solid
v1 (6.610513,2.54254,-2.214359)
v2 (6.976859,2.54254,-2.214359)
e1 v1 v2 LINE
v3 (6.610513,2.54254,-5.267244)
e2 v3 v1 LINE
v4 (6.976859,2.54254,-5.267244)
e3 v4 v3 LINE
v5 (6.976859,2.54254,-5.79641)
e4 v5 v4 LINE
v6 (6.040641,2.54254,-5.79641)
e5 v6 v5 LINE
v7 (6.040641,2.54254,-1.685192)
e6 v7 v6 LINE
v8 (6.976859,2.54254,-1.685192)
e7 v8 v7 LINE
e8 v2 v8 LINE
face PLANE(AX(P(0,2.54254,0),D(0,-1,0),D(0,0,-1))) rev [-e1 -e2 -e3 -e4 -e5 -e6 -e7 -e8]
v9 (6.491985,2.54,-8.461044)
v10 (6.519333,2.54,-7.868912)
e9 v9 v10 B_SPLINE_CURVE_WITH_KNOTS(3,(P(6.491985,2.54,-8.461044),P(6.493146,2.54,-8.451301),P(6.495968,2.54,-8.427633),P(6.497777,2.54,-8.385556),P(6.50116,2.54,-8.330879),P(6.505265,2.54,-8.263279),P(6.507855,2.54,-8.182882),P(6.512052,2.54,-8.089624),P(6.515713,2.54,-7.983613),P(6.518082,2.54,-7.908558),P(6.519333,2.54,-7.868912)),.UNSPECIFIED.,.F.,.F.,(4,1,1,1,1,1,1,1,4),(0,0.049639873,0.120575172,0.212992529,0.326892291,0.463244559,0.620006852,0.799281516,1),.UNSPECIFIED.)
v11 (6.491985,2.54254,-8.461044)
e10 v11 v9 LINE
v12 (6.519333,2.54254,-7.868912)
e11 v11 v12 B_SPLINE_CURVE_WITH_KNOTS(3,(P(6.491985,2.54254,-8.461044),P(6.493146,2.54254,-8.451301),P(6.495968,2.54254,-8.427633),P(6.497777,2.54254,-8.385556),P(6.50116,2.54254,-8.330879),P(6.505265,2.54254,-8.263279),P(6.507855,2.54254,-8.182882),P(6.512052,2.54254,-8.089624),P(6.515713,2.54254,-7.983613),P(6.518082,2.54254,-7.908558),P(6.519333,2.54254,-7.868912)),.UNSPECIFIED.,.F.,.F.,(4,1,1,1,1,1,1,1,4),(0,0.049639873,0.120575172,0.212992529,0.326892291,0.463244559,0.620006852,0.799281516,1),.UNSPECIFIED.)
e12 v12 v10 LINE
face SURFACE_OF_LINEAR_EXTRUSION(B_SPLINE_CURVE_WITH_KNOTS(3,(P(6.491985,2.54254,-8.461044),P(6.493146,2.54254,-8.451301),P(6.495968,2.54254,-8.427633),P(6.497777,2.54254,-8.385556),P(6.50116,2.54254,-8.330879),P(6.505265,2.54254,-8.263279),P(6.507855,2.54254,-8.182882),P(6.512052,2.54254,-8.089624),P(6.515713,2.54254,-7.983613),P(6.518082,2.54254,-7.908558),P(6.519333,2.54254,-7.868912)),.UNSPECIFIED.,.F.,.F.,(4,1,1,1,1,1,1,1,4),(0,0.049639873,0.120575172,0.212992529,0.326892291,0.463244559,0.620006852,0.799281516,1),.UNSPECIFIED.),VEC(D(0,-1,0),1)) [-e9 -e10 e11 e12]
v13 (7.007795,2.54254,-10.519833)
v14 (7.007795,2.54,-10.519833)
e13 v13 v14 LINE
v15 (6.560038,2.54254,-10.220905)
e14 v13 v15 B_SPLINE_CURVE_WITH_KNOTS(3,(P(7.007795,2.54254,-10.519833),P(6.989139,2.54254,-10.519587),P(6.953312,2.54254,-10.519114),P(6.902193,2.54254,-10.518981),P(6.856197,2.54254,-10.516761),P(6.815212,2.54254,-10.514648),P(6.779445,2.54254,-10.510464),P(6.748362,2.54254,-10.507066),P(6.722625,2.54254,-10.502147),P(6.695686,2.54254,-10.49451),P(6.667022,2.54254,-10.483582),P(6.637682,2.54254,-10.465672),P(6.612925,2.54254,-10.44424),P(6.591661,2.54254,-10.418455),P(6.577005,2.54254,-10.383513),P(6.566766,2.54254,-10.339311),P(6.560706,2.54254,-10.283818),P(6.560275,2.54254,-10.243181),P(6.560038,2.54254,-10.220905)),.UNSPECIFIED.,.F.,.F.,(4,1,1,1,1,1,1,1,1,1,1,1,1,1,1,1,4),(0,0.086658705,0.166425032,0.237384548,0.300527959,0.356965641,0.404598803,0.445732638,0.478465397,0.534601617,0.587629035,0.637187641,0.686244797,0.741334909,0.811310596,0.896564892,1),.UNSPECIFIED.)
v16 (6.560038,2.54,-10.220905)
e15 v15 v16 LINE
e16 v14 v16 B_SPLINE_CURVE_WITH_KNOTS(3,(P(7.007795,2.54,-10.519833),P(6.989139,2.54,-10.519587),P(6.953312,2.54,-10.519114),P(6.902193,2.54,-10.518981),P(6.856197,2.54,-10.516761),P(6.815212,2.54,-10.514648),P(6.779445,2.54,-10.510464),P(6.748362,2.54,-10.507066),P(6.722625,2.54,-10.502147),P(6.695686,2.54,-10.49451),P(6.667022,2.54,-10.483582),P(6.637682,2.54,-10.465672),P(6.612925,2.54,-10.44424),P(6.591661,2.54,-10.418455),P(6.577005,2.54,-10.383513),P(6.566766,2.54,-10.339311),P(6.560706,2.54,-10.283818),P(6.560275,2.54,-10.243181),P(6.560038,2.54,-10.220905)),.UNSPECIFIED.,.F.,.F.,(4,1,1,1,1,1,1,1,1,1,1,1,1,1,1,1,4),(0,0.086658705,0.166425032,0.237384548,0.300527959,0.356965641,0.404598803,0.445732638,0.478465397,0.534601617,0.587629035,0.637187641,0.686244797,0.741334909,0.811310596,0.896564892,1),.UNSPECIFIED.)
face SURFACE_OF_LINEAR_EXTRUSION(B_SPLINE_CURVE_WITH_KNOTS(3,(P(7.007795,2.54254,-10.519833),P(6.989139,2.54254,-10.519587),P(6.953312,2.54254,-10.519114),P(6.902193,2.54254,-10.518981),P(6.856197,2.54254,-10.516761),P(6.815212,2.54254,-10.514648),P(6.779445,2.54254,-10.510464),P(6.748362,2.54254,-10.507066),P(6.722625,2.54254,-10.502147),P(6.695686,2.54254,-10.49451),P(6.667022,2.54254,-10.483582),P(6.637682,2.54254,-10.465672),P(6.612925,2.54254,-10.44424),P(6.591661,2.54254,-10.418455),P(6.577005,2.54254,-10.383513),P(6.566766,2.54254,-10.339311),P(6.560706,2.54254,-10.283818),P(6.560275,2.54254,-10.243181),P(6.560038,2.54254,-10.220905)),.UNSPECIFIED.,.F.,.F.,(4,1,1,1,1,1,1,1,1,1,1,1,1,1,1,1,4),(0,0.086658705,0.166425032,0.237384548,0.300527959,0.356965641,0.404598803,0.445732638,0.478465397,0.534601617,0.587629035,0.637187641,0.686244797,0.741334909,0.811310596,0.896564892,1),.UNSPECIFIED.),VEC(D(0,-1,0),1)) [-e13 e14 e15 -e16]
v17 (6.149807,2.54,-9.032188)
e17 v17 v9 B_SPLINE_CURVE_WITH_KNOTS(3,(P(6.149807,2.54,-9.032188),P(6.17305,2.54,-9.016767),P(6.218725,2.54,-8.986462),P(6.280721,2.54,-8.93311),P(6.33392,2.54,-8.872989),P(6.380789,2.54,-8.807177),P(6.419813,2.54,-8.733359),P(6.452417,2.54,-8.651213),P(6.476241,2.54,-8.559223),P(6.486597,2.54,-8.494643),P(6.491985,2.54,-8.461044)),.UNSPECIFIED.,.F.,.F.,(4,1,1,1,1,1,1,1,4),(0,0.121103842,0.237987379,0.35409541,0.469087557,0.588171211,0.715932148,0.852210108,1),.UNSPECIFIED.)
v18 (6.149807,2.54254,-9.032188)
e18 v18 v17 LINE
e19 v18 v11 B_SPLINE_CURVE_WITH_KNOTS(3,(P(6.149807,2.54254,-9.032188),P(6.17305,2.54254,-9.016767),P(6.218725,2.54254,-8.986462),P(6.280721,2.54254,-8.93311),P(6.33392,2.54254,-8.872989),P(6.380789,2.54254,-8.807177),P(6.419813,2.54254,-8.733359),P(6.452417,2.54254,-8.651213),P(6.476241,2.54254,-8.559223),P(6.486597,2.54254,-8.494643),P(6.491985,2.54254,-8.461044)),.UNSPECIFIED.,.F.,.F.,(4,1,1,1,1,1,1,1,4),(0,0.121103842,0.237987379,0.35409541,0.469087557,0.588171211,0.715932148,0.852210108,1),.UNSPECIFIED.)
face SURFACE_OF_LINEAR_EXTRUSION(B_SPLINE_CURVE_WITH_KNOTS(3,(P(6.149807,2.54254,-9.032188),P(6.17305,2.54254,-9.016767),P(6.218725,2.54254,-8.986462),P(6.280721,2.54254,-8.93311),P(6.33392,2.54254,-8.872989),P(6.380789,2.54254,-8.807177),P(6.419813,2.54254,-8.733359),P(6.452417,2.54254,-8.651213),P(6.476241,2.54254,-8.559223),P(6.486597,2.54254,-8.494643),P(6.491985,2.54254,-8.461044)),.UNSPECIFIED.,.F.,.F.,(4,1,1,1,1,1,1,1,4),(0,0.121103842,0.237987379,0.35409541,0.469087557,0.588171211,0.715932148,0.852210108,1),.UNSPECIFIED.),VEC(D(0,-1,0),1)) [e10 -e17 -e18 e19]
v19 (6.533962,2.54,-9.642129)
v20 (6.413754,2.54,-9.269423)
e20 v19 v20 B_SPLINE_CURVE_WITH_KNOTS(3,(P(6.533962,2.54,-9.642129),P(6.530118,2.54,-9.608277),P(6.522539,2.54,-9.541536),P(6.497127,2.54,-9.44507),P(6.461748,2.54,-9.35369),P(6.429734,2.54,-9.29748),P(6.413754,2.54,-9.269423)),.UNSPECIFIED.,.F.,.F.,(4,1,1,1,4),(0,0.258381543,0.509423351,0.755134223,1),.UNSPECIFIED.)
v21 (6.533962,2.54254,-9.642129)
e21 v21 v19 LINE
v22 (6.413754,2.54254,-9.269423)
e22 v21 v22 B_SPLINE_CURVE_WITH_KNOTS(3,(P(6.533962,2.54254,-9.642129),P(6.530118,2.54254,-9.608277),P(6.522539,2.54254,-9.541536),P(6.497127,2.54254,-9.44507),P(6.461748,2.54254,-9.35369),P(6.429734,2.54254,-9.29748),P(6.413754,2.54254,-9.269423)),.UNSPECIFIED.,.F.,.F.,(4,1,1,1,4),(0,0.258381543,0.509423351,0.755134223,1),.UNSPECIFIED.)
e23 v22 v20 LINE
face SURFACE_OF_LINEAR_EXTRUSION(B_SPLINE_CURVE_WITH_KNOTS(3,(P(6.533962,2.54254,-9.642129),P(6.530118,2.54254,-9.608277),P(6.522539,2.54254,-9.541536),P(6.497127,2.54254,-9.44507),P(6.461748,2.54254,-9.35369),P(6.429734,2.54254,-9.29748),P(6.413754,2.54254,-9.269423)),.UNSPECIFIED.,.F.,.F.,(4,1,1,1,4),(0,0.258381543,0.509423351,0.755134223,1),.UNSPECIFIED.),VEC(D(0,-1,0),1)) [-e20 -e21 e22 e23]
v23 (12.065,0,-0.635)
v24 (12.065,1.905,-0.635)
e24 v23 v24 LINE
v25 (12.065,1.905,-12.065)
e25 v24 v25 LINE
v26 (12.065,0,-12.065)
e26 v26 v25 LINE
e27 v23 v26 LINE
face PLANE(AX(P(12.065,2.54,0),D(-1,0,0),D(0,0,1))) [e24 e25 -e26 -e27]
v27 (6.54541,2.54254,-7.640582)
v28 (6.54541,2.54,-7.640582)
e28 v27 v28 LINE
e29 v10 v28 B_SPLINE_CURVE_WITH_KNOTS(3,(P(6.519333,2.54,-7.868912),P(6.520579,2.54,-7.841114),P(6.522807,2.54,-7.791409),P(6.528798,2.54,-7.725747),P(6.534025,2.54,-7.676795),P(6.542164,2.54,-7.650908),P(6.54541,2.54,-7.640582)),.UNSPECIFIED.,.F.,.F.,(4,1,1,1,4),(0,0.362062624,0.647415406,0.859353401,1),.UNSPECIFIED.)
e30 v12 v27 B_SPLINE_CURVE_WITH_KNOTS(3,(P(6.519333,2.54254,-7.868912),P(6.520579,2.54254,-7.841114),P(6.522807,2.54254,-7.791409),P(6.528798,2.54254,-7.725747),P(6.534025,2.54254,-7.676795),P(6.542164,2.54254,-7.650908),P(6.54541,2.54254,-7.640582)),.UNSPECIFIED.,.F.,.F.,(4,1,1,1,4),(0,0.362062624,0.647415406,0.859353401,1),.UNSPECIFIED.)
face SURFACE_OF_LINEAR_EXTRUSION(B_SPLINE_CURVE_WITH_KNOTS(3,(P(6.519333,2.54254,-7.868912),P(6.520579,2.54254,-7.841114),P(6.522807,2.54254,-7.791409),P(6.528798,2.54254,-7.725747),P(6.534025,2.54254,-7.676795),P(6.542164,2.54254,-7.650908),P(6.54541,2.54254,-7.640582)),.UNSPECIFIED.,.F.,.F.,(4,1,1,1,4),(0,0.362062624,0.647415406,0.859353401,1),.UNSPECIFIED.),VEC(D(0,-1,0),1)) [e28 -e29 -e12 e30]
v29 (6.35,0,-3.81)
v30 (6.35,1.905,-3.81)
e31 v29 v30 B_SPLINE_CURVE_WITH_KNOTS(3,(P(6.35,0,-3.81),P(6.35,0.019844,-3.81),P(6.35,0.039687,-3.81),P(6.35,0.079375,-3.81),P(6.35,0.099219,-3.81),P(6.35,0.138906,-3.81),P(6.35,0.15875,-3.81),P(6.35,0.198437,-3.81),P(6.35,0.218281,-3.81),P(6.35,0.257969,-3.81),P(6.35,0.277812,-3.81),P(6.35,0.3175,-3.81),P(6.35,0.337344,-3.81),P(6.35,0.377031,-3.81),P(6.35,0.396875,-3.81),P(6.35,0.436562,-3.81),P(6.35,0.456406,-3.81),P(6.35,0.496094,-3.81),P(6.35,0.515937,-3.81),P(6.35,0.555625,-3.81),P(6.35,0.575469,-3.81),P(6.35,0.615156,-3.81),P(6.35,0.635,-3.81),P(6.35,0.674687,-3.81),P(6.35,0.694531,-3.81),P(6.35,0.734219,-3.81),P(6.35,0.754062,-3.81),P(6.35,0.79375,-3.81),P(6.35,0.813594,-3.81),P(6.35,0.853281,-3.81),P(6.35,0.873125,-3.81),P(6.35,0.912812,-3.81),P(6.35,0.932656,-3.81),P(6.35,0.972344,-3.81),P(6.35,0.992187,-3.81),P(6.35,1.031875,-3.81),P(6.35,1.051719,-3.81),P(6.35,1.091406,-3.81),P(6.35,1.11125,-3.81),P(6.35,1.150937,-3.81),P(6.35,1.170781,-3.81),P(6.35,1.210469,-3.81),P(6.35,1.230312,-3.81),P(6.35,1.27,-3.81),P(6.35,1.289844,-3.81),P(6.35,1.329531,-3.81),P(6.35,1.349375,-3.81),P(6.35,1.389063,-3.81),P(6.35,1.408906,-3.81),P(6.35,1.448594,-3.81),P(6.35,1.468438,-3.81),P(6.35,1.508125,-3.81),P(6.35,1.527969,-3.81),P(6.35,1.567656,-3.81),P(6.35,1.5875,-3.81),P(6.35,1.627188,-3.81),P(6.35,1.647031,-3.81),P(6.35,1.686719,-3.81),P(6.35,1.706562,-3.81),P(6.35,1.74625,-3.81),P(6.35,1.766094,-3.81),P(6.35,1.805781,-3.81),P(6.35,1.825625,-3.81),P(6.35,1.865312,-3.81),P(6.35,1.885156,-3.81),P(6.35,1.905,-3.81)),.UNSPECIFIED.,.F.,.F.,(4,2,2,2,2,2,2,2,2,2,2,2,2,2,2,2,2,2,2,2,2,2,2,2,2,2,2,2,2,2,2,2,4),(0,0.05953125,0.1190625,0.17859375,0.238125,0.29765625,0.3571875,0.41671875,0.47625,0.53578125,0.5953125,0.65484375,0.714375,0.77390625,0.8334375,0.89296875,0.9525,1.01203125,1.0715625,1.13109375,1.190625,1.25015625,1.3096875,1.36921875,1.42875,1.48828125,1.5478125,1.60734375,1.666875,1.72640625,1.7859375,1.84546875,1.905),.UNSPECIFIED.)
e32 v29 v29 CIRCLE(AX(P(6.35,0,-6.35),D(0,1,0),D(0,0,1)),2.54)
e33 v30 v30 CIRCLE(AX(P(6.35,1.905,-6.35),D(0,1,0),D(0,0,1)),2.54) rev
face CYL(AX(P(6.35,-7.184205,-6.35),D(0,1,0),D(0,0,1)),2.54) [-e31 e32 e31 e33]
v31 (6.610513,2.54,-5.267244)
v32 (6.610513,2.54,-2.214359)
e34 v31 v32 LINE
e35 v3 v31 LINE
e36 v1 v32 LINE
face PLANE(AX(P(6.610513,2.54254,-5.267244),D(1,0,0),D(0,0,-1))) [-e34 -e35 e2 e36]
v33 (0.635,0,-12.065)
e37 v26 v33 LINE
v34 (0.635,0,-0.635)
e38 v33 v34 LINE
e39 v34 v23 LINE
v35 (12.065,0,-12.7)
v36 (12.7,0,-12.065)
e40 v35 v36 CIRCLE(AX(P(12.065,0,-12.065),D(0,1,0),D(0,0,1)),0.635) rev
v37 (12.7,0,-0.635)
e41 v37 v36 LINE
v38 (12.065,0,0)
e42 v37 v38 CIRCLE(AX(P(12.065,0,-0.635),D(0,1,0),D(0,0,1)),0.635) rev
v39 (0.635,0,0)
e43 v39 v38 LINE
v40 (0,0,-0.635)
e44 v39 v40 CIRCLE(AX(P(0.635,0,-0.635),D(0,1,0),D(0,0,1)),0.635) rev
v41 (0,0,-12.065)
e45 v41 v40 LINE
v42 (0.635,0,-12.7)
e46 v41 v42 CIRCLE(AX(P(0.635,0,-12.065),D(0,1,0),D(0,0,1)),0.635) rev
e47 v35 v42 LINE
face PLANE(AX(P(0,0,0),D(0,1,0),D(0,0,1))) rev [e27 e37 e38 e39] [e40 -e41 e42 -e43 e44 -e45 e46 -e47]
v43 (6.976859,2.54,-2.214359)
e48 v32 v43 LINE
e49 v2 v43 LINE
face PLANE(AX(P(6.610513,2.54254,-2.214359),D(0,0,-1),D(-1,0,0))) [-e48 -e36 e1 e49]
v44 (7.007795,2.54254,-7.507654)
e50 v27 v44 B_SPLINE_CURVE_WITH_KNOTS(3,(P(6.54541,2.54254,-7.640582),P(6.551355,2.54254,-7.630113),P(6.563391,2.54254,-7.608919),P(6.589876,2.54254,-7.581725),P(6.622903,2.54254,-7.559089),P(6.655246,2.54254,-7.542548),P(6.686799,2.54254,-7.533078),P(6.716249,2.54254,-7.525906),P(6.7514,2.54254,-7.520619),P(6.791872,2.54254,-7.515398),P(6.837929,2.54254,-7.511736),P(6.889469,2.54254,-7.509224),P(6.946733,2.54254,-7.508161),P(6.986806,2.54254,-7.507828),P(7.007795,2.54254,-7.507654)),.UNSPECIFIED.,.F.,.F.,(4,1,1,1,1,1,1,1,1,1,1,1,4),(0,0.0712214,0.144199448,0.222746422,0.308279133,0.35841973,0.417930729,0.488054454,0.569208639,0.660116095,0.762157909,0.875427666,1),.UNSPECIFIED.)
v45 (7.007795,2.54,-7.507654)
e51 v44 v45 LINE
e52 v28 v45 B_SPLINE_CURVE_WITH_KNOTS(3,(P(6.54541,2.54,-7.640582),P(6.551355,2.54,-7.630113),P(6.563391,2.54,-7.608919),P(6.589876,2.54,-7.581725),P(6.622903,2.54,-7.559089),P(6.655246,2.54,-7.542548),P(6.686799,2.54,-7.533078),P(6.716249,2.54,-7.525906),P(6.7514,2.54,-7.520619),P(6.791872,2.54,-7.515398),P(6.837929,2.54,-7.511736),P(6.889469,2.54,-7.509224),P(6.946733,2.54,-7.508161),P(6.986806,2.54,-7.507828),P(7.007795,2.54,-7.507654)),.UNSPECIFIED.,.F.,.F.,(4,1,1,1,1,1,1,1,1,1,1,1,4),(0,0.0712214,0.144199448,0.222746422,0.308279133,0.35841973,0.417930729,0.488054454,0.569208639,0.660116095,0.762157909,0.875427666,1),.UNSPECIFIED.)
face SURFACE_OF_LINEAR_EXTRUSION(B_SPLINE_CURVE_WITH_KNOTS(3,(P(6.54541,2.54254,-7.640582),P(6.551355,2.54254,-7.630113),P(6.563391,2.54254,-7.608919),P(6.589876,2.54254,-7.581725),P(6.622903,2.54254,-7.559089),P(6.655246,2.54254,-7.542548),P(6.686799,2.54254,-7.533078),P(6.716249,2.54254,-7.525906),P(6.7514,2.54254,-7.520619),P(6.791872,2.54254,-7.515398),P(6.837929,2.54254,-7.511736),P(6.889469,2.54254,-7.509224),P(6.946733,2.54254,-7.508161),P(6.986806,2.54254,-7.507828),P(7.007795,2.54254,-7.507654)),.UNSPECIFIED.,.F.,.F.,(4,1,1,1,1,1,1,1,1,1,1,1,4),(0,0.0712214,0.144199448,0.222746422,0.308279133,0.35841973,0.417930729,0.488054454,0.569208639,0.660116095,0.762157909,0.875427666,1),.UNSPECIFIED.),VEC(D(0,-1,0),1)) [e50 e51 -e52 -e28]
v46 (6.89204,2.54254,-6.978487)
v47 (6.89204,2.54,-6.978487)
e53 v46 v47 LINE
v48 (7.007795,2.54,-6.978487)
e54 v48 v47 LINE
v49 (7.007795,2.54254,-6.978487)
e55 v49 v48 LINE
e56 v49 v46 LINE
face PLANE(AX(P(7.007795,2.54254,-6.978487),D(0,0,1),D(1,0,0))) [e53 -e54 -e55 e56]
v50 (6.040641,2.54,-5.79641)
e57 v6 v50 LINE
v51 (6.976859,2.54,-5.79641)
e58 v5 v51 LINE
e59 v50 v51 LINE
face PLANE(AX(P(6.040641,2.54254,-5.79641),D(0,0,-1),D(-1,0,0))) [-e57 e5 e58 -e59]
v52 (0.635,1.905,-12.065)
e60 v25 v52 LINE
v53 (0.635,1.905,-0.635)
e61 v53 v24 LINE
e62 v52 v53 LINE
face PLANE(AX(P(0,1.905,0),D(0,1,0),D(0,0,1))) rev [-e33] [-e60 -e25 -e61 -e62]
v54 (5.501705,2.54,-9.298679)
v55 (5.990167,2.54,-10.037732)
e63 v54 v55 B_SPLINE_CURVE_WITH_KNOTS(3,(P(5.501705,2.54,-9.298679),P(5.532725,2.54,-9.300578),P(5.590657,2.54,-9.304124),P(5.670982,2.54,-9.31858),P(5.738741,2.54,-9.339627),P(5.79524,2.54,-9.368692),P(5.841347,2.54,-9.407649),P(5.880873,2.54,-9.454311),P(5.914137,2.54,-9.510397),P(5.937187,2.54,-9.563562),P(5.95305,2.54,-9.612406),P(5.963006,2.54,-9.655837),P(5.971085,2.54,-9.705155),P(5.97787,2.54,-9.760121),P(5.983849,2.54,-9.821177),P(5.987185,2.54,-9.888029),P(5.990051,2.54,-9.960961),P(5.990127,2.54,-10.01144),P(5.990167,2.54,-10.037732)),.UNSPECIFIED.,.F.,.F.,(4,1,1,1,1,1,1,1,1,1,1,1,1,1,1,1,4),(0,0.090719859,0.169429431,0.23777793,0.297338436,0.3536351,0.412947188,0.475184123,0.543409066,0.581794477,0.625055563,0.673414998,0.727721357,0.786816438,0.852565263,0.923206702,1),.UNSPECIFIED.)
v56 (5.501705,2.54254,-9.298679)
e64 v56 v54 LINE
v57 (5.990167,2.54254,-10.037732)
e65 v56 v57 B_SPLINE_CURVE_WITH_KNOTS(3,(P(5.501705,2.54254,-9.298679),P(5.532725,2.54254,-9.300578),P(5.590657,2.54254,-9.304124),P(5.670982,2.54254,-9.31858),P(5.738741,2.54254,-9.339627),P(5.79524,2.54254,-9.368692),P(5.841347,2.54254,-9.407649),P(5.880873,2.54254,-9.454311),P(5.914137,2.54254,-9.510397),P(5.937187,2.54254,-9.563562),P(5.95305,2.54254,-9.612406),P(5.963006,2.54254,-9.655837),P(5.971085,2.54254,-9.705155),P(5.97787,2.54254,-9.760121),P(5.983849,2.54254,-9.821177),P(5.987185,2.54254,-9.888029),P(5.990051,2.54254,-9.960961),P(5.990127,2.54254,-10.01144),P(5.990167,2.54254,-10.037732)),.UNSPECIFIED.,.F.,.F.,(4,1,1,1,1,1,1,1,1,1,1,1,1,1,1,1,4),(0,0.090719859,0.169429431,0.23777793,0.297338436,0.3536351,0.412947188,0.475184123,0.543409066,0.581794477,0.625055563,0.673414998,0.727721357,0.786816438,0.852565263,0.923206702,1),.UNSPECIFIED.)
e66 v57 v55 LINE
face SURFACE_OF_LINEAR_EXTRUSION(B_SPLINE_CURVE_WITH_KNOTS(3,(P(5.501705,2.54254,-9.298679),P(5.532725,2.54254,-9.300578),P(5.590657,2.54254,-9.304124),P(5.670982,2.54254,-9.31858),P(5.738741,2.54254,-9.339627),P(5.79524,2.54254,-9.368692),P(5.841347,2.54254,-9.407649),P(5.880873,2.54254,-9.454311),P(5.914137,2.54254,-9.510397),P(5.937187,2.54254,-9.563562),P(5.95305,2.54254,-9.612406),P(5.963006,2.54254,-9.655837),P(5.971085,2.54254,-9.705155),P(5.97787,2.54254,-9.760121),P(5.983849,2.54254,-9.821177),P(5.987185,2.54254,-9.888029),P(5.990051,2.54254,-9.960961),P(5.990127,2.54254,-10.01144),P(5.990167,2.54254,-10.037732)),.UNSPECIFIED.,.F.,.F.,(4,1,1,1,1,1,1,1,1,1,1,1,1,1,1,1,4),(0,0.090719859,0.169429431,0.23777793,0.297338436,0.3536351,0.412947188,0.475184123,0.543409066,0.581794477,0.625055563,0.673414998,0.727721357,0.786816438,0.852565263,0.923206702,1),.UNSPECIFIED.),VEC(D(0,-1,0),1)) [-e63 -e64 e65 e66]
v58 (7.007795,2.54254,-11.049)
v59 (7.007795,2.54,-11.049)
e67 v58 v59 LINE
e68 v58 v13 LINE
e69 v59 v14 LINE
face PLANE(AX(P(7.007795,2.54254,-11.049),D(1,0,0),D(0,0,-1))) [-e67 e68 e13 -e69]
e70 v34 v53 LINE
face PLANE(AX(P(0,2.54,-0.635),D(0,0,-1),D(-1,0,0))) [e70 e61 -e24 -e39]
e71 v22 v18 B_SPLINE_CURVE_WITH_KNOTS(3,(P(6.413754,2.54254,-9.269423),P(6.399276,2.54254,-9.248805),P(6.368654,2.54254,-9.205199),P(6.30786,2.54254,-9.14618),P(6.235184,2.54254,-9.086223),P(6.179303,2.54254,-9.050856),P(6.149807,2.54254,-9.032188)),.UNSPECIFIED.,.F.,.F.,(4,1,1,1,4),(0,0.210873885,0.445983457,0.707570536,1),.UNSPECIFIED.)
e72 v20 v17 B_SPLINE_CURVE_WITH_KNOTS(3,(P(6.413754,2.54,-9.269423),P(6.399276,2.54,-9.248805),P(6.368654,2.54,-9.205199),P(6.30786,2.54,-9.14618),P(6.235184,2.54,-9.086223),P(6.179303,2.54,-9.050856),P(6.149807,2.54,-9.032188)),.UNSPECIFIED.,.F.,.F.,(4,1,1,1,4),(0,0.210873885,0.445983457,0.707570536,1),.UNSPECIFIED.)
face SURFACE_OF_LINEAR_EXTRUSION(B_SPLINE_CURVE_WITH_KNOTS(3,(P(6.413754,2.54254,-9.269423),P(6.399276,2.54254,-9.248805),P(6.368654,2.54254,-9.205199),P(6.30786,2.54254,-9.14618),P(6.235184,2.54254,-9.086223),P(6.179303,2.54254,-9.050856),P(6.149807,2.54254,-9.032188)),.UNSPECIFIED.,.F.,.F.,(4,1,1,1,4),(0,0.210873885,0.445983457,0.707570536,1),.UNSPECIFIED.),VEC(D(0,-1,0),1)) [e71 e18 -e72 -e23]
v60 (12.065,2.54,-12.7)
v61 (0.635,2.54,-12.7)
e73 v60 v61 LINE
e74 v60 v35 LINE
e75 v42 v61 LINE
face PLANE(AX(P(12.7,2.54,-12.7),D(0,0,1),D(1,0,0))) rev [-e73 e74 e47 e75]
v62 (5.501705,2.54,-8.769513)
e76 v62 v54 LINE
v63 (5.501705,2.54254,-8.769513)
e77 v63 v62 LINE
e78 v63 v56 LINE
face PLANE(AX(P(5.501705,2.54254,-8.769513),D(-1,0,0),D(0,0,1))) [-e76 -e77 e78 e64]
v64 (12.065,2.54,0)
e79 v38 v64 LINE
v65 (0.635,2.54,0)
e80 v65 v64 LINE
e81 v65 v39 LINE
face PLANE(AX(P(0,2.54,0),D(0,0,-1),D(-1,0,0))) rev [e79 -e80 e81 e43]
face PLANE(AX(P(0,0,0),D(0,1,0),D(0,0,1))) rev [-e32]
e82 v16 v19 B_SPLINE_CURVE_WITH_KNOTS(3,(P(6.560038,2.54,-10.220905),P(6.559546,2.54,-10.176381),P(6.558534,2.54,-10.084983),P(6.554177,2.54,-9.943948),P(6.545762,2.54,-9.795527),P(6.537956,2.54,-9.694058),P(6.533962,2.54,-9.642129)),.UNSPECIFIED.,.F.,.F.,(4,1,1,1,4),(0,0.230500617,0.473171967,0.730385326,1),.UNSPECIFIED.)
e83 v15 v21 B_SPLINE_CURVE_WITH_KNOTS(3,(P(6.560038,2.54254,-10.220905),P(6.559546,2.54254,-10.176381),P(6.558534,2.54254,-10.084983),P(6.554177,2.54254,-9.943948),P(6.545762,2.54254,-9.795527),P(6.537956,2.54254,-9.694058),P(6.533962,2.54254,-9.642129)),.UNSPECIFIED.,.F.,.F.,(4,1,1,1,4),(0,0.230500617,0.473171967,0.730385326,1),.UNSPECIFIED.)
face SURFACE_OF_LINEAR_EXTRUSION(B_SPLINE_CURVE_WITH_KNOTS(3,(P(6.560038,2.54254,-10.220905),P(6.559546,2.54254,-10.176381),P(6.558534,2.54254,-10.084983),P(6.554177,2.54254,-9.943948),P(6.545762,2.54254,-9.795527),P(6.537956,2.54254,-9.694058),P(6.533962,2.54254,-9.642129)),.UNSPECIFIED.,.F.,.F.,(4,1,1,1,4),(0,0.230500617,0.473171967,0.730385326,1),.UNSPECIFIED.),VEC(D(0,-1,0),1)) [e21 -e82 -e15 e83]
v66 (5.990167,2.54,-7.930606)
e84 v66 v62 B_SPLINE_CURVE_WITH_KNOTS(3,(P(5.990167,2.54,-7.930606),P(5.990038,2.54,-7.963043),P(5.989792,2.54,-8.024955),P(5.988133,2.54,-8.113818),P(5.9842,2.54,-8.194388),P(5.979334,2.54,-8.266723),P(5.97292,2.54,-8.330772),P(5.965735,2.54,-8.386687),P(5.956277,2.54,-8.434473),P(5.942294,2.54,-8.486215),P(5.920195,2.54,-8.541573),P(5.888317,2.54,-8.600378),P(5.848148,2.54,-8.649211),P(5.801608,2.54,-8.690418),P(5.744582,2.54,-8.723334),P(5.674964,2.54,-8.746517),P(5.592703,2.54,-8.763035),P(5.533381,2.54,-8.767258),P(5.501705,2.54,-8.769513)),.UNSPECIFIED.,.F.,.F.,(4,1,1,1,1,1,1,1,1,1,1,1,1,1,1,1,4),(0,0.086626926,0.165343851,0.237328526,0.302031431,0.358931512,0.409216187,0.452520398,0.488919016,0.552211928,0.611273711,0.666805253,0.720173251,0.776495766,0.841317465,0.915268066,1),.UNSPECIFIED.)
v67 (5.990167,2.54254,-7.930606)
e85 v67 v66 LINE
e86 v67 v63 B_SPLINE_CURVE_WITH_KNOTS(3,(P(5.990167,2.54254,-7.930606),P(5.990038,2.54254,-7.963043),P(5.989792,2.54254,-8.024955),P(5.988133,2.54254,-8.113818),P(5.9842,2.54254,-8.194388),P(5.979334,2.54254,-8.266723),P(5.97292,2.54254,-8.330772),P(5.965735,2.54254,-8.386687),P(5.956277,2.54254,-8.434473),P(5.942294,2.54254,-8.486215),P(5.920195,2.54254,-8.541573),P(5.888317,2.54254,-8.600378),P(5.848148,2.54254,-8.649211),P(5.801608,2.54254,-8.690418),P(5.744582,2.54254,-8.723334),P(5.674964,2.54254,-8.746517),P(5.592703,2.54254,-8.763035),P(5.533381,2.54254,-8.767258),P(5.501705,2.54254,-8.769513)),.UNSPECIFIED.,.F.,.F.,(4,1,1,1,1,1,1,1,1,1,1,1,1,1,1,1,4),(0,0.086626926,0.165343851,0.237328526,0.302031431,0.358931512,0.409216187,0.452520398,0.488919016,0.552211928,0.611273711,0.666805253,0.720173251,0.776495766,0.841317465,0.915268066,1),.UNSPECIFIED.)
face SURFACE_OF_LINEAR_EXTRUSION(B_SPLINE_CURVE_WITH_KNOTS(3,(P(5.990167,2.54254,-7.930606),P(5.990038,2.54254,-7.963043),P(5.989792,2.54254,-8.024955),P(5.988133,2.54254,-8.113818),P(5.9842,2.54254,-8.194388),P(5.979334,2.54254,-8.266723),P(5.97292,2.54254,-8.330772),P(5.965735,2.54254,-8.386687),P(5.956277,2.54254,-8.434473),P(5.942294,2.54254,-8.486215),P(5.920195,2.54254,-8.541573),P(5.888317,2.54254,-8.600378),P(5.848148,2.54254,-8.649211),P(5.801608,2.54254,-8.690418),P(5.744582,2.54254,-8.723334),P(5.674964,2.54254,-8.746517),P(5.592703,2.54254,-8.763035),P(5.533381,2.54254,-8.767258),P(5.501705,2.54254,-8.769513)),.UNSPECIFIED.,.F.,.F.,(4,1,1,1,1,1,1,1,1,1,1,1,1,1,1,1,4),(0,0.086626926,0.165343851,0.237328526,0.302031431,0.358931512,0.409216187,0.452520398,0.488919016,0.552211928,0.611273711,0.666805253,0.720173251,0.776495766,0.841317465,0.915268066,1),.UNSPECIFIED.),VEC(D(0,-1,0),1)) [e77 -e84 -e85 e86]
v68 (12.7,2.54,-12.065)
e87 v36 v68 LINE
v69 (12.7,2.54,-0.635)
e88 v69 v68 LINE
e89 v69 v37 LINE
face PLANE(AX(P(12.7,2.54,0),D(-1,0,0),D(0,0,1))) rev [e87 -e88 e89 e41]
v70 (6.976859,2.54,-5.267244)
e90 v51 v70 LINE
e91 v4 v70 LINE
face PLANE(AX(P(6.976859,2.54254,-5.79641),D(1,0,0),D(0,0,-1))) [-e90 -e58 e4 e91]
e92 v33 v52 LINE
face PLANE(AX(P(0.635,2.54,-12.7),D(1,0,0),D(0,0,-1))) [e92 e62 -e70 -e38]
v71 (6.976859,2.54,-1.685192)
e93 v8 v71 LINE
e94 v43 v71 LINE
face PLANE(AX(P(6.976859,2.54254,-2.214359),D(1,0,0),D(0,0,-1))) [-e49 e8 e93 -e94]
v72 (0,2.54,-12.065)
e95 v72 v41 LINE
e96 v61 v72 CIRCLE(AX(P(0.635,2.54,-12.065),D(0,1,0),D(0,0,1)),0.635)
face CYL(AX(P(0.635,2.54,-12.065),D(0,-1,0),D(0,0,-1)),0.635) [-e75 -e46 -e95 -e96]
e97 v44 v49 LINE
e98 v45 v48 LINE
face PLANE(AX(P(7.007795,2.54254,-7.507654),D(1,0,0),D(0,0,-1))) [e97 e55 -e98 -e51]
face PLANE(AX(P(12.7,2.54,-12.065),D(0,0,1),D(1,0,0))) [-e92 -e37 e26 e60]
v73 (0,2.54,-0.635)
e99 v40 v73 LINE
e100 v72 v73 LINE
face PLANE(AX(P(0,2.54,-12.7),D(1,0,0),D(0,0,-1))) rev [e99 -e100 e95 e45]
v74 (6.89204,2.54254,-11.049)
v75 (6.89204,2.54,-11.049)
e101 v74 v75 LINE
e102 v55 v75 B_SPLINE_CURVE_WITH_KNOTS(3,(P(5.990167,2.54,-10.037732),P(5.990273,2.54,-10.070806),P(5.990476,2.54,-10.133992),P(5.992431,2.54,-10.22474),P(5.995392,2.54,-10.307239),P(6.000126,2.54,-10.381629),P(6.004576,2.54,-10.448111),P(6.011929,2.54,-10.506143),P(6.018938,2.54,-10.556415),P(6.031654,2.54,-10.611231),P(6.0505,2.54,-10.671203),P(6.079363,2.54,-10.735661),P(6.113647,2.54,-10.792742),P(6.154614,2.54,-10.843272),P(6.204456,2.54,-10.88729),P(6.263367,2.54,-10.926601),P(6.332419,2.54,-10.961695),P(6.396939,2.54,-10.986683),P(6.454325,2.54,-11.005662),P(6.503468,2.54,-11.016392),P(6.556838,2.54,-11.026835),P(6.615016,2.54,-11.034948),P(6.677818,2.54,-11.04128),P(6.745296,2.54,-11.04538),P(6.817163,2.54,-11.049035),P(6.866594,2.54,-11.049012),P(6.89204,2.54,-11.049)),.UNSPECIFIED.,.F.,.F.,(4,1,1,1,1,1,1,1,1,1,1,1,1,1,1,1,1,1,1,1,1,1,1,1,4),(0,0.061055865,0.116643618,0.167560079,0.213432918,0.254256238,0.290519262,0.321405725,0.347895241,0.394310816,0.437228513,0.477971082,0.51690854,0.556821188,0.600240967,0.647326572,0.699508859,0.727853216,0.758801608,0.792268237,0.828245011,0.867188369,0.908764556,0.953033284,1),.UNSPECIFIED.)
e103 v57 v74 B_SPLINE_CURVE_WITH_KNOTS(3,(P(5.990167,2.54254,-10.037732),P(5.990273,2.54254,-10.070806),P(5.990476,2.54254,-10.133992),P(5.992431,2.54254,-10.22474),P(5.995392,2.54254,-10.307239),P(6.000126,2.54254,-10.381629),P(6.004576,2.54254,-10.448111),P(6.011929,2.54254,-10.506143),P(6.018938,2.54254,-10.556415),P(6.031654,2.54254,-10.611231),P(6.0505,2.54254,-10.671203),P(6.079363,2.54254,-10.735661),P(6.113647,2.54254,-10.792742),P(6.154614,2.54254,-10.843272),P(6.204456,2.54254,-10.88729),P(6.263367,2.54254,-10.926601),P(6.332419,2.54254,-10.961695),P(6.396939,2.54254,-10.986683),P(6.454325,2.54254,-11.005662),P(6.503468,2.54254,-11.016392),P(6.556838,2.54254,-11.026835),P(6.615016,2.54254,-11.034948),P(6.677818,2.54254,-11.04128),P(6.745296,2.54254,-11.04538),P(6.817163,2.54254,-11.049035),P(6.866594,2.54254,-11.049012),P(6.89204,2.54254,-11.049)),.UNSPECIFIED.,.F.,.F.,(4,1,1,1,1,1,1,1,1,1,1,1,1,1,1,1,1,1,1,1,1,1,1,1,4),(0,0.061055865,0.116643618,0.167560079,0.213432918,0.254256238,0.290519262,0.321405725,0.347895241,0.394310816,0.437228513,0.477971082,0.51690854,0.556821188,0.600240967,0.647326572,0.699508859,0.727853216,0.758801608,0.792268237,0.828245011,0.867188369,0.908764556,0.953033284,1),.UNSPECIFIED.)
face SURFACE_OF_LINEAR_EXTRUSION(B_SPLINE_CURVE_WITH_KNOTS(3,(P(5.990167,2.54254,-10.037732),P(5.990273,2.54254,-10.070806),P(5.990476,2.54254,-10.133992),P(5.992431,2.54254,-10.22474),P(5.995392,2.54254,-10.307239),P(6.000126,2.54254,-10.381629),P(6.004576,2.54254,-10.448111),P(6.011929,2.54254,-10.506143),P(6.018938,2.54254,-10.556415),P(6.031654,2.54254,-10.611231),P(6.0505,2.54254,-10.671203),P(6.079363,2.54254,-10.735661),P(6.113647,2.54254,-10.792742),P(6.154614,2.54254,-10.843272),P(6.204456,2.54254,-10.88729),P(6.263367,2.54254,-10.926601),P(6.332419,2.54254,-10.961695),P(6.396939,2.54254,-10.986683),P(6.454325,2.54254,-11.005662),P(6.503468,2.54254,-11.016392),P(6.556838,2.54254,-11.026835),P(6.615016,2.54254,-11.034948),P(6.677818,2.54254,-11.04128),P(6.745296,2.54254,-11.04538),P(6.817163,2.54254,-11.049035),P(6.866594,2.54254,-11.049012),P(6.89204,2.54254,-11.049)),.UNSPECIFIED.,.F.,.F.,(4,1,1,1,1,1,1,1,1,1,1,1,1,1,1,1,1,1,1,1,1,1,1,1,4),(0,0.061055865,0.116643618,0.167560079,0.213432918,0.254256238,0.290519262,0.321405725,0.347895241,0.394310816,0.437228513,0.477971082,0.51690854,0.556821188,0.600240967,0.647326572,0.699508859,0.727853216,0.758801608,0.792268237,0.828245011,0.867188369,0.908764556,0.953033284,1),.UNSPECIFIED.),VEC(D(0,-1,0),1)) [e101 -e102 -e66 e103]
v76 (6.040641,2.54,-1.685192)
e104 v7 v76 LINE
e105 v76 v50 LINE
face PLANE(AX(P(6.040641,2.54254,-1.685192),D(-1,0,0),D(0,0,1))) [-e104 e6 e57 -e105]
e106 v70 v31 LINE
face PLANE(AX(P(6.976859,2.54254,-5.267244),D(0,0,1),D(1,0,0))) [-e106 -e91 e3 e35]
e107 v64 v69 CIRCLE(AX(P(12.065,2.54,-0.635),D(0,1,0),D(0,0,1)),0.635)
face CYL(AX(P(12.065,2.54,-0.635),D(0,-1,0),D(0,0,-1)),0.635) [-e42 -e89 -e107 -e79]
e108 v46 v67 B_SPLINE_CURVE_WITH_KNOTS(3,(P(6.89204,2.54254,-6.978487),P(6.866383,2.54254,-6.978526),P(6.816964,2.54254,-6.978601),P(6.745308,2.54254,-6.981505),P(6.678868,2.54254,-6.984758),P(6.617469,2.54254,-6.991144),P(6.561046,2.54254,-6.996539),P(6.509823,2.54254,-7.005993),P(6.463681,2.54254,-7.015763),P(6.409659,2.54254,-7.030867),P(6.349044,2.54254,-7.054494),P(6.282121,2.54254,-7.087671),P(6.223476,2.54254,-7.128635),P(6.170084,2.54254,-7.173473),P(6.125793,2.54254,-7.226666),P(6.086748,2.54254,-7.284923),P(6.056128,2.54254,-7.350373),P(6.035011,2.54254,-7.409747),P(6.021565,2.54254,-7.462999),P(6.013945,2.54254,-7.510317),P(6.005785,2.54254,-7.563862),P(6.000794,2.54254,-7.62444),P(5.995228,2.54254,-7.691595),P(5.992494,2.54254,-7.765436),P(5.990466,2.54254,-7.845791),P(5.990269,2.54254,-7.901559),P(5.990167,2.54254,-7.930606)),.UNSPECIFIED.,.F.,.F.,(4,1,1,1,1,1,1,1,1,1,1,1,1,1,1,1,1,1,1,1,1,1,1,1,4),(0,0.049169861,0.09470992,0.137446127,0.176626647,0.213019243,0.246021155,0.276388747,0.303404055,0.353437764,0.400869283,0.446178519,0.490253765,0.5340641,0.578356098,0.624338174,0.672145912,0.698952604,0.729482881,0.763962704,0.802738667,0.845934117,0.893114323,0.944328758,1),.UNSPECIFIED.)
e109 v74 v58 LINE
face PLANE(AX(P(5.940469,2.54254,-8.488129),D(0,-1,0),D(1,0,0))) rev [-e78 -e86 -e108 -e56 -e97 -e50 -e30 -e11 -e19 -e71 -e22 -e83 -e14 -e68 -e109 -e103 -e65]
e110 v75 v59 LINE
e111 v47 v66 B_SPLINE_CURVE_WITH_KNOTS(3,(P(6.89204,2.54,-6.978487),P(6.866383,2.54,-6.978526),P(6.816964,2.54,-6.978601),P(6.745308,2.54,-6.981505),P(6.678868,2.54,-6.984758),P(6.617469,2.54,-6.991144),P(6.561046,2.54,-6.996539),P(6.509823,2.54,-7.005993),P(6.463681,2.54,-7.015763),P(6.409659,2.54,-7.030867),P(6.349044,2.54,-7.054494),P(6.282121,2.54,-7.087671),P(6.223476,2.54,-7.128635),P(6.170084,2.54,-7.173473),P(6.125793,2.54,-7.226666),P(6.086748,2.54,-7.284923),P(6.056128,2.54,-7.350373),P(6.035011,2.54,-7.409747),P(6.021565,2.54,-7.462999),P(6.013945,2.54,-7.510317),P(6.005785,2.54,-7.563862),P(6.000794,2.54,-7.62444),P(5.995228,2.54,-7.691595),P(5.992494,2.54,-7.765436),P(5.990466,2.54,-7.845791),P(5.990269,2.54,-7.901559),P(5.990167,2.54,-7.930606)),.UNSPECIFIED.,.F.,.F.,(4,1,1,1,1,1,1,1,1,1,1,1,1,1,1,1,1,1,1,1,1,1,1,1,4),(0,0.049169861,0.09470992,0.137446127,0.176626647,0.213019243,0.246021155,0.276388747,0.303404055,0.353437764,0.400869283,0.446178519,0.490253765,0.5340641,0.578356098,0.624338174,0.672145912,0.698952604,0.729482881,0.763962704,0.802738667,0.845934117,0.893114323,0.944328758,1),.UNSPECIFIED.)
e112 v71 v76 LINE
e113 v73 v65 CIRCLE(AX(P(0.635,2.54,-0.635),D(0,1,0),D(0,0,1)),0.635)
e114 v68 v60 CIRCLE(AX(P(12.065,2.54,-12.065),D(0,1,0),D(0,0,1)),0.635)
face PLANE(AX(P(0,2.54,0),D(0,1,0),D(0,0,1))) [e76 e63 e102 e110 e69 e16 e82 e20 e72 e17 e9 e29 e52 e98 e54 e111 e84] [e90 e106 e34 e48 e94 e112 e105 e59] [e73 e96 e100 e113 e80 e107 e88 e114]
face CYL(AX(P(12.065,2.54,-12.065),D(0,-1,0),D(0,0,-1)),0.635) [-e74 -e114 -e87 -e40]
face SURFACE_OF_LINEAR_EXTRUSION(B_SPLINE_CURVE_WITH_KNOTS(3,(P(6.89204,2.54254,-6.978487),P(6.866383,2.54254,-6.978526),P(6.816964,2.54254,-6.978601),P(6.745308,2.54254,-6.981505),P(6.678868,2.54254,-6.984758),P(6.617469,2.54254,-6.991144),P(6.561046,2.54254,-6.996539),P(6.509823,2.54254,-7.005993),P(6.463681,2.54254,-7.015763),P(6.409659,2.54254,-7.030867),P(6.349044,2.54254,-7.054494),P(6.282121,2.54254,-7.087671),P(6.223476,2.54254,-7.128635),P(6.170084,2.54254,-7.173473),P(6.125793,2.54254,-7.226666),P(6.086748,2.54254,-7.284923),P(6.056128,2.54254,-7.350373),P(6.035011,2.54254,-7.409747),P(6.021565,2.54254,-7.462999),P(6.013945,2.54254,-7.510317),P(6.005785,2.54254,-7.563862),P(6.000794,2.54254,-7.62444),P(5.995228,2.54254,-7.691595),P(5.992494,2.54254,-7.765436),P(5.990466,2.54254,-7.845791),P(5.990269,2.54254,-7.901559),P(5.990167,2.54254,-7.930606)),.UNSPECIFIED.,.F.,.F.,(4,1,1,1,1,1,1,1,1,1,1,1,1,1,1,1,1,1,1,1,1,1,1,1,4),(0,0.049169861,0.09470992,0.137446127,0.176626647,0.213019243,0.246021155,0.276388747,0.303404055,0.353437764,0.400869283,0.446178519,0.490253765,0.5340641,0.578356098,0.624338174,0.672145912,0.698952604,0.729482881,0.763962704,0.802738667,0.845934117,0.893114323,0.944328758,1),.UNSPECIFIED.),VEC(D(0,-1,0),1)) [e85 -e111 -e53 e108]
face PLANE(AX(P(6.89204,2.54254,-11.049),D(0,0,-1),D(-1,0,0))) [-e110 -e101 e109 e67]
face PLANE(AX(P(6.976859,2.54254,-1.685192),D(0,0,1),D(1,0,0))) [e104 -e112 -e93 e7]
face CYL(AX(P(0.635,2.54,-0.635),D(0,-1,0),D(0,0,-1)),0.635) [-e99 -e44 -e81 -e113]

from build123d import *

# Parameters (mm, degrees)
SKETCH1_W           = 12.7
SKETCH1_H           = 12.7
BOSS_EXTRUDE1_DEPTH = 2.54
FILLET1_R           = 0.635
SHELL1_START        = 0.635
SHELL1_OUTLINE_W    = 1.905
SHELL1_OUTLINE_H    = 11.43
SHELL1_DEPTH        = 11.43
SKETCH2_R           = 2.54
BOSS_EXTRUDE2_DEPTH = 1.905
BOSS_EXTRUDE4_DEPTH = 0.00254


# Read off the part's stored shape, not the designer's step: Shell1
with BuildPart() as part:
    # Sketch1 → Boss-Extrude1 (new body)
    with BuildSketch(Plane(origin=(0, 0, 0), x_dir=(1, 0, 0), z_dir=(0, 1, 0))):
        with Locations((6.35, 6.35)):
            Rectangle(SKETCH1_W, SKETCH1_H)
    extrude(amount=BOSS_EXTRUDE1_DEPTH)

    # Fillet1
    fillet1_edges = [part.edges().sort_by_distance(p)[0] for p in [
        (0, 1.27, -12.7),
        (12.7, 1.27, -12.7),
        (12.7, 1.27, 0),
        (0, 1.27, 0),
    ]]
    fillet(fillet1_edges, radius=FILLET1_R)

    # Shell1 outline → Shell1 (cut)
    with BuildSketch(Plane.YZ.offset(SHELL1_START)):
        with Locations((0.9525, -6.35)):
            Rectangle(SHELL1_OUTLINE_W, SHELL1_OUTLINE_H)
    extrude(amount=SHELL1_DEPTH, mode=Mode.SUBTRACT)

    # Sketch2 → Boss-Extrude2 (add)
    with BuildSketch(Plane(origin=(0, 1.905, 0), x_dir=(-1, 0, 0), z_dir=(0, -1, 0))):
        with Locations(Location((-6.35, 6.35, 0), (0, 0, 270))):
            Circle(SKETCH2_R)
    extrude(amount=BOSS_EXTRUDE2_DEPTH)

    # Sketch4 → Boss-Extrude4 (add)
    with BuildSketch(Plane(origin=(0, 2.54, 0), x_dir=(1, 0, 0), z_dir=(0, 1, 0))):
        Polygon((6.040641026, 5.796410256), (6.976858974, 5.796410256), (6.976858974, 5.26724359), (6.610512821, 5.26724359), (6.610512821, 2.214358974), (6.976858974, 2.214358974), (6.976858974, 1.685192308), (6.040641026, 1.685192308), align=None)
        with BuildLine():
            Line((5.501705128, 8.769512821), (5.501705128, 9.298679487))
            add(Edge.make_bspline(
                [(5.501705128, 9.298679487), (5.532724551, 9.300577954), (5.590656774, 9.304123553), (5.670981575, 9.318580211), (5.738741024, 9.339627117), (5.795240216, 9.368692195), (5.841347316, 9.407649179), (5.880872771, 9.454311284), (5.914137334, 9.51039725), (5.937186765, 9.563561565), (5.953049789, 9.612405831), (5.963005648, 9.655837142), (5.971085115, 9.705154512), (5.97787015, 9.760121424), (5.983848589, 9.821176644), (5.987184914, 9.888028776), (5.990050912, 9.960961441), (5.990127023, 10.011439709), (5.990166667, 10.037731971)],
                knots=[0, 0, 0, 0, 1.451517752, 2.710870899, 3.804446884, 4.757414975, 5.658161607, 6.607155001, 7.602945962, 8.694545061, 9.30871163, 10.000889012, 10.774639975, 11.643541707, 12.589063004, 13.641044214, 14.771307238, 16, 16, 16, 16], degree=3))
            add(Edge.make_bspline(
                [(5.990166667, 10.037731971), (5.99027291, 10.070806168), (5.990475881, 10.133992465), (5.992430984, 10.224740262), (5.995391945, 10.307239275), (6.000125578, 10.381629312), (6.004576412, 10.448111322), (6.011928876, 10.506142904), (6.018937818, 10.556415186), (6.031654225, 10.611230568), (6.050499963, 10.67120317), (6.079363112, 10.735660672), (6.113646688, 10.792741786), (6.154613928, 10.843272465), (6.204455745, 10.88728976), (6.263366728, 10.926601221), (6.332418843, 10.96169463), (6.396939353, 10.986683085), (6.454324586, 11.005661541), (6.50346794, 11.016391589), (6.556837627, 11.026835102), (6.61501627, 11.034947693), (6.677817883, 11.041279814), (6.745295804, 11.045379799), (6.817163158, 11.049034753), (6.866593581, 11.04901181), (6.892039663, 11.049)],
                knots=[0, 0, 0, 0, 1.46534077, 2.799446828, 4.021441889, 5.122390044, 6.102149716, 6.972462297, 7.7137374, 8.349485774, 9.463459583, 10.49348432, 11.471305969, 12.40580496, 13.363708508, 14.405783216, 15.535837735, 16.788212615, 17.468477195, 18.211238595, 19.014437677, 19.877880266, 20.812520865, 21.810349341, 22.872798814, 24, 24, 24, 24], degree=3))
            Line((6.892039663, 11.049), (7.007794872, 11.049))
            Line((7.007794872, 11.049), (7.007794872, 10.519833333))
            add(Edge.make_bspline(
                [(7.007794872, 10.519833333), (6.989139417, 10.519587027), (6.953312265, 10.519114005), (6.902192532, 10.51898063), (6.856196849, 10.516761047), (6.815211942, 10.514648161), (6.779444801, 10.510463786), (6.748361679, 10.507065532), (6.722625011, 10.502147344), (6.69568576, 10.49451003), (6.667022453, 10.483581701), (6.637681703, 10.465672367), (6.612925486, 10.444240108), (6.591660898, 10.418455284), (6.577004821, 10.383512508), (6.566766404, 10.339311488), (6.560706101, 10.283818342), (6.560274859, 10.243181314), (6.560038462, 10.220905048)],
                knots=[0, 0, 0, 0, 1.386539278, 2.662800514, 3.798152769, 4.808447339, 5.711450255, 6.473580847, 7.131722202, 7.655446357, 8.553625873, 9.402064563, 10.195002251, 10.979916755, 11.86135854, 12.980969535, 14.34503827, 16, 16, 16, 16], degree=3))
            add(Edge.make_bspline(
                [(6.560038462, 10.220905048), (6.559545706, 10.176381457), (6.558534177, 10.084983372), (6.554177156, 9.943947845), (6.545761586, 9.795526586), (6.537956266, 9.694057712), (6.533961739, 9.642129006)],
                knots=[0, 0, 0, 0, 0.92200247, 1.892687869, 2.921541302, 4, 4, 4, 4], degree=3))
            add(Edge.make_bspline(
                [(6.533961739, 9.642129006), (6.530117819, 9.608277323), (6.522539172, 9.541535565), (6.497126743, 9.445069771), (6.461748345, 9.353690497), (6.429734003, 9.297479672), (6.413754407, 9.269422676)],
                knots=[0, 0, 0, 0, 1.03352617, 2.037693405, 3.020536894, 4, 4, 4, 4], degree=3))
            add(Edge.make_bspline(
                [(6.413754407, 9.269422676), (6.399275564, 9.248804803), (6.368653828, 9.205199448), (6.307860152, 9.146179587), (6.235183983, 9.086222662), (6.179303029, 9.050855916), (6.149807091, 9.032188101)],
                knots=[0, 0, 0, 0, 0.843495541, 1.78393383, 2.830282145, 4, 4, 4, 4], degree=3))
            add(Edge.make_bspline(
                [(6.149807091, 9.032188101), (6.173049633, 9.016766999), (6.218724746, 8.986462199), (6.280720945, 8.933109752), (6.333920011, 8.872989352), (6.380789418, 8.807176718), (6.419813309, 8.733359395), (6.452416847, 8.6512131), (6.476240614, 8.55922335), (6.486596694, 8.49464301), (6.491984575, 8.461044271)],
                knots=[0, 0, 0, 0, 0.968830733, 1.903899033, 2.832763283, 3.752700456, 4.705369692, 5.727457187, 6.817680861, 8, 8, 8, 8], degree=3))
            add(Edge.make_bspline(
                [(6.491984575, 8.461044271), (6.493146133, 8.451300636), (6.495967556, 8.427633362), (6.497777051, 8.385555815), (6.50116022, 8.330878989), (6.505264993, 8.263278599), (6.507854941, 8.182882253), (6.512052118, 8.089623889), (6.515713081, 7.98361332), (6.518082021, 7.908557532), (6.519333333, 7.868911859)],
                knots=[0, 0, 0, 0, 0.397118983, 0.964601375, 1.703940229, 2.615138326, 3.70595647, 4.960054814, 6.394252129, 8, 8, 8, 8], degree=3))
            add(Edge.make_bspline(
                [(6.519333333, 7.868911859), (6.520579054, 7.841114333), (6.522806566, 7.791408715), (6.528797656, 7.725746662), (6.534024869, 7.676794658), (6.54216353, 7.65090783), (6.545410056, 7.64058153)],
                knots=[0, 0, 0, 0, 1.448250494, 2.589661623, 3.437413606, 4, 4, 4, 4], degree=3))
            add(Edge.make_bspline(
                [(6.545410056, 7.64058153), (6.551354746, 7.630113272), (6.56339075, 7.608918561), (6.589875696, 7.581725399), (6.622903191, 7.55908913), (6.655245791, 7.542548203), (6.686799456, 7.533078155), (6.716248693, 7.52590647), (6.751399708, 7.520618856), (6.7918716, 7.515397976), (6.837928889, 7.51173648), (6.88946915, 7.509224277), (6.946733128, 7.508161361), (6.986806182, 7.507828294), (7.007794872, 7.507653846)],
                knots=[0, 0, 0, 0, 0.854656799, 1.730393381, 2.672957062, 3.699349592, 4.301036757, 5.015168751, 5.856653451, 6.830503664, 7.921393134, 9.14589491, 10.505131993, 12, 12, 12, 12], degree=3))
            Line((7.007794872, 7.507653846), (7.007794872, 6.978487179))
            Line((7.007794872, 6.978487179), (6.892039663, 6.978487179))
            add(Edge.make_bspline(
                [(6.892039663, 6.978487179), (6.866383077, 6.978526215), (6.816963917, 6.978601404), (6.745307814, 6.981504501), (6.678867696, 6.984758361), (6.61746922, 6.991144216), (6.561045697, 6.996538747), (6.50982297, 7.005993345), (6.463681374, 7.015763286), (6.409658587, 7.030867229), (6.349044044, 7.054494053), (6.282121034, 7.08767088), (6.223475812, 7.128634915), (6.170084284, 7.173473086), (6.125792724, 7.226665597), (6.086748214, 7.284923434), (6.056128199, 7.350373385), (6.035010547, 7.409747118), (6.021564816, 7.462998966), (6.01394496, 7.510317213), (6.005784949, 7.563862295), (6.000793847, 7.624440305), (5.995228131, 7.691595022), (5.992493569, 7.765435518), (5.990466407, 7.845791113), (5.990269319, 7.901558967), (5.990166667, 7.930605569)],
                knots=[0, 0, 0, 0, 1.180076656, 2.27303809, 3.298707054, 4.239039526, 5.112461827, 5.904507711, 6.633329935, 7.281697308, 8.48250633, 9.620862782, 10.708284457, 11.766090354, 12.817538401, 13.88054636, 14.984116166, 16.131501886, 16.774862487, 17.507589143, 18.335104889, 19.265728017, 20.302418806, 21.434743744, 22.663890185, 24, 24, 24, 24], degree=3))
            add(Edge.make_bspline(
                [(5.990166667, 7.930605569), (5.990037977, 7.963042723), (5.989792348, 8.02495516), (5.988132762, 8.113818002), (5.98420043, 8.194387809), (5.979333537, 8.266723087), (5.972920121, 8.330771786), (5.965735187, 8.386687047), (5.95627693, 8.434472879), (5.942293856, 8.486214809), (5.920195452, 8.541572567), (5.888317363, 8.600377736), (5.848148398, 8.649211105), (5.801607935, 8.690417629), (5.744582017, 8.723334024), (5.67496369, 8.746517187), (5.592703317, 8.763035254), (5.533381357, 8.767257997), (5.501705128, 8.769512821)],
                knots=[0, 0, 0, 0, 1.386030809, 2.645501613, 3.797256415, 4.832502903, 5.742904192, 6.547458989, 7.240326361, 7.822704252, 8.835390849, 9.780379381, 10.668884048, 11.522772015, 12.423932252, 13.461079439, 14.644289055, 16, 16, 16, 16], degree=3))
        make_face()
    extrude(amount=BOSS_EXTRUDE4_DEPTH)


solid = part.part
